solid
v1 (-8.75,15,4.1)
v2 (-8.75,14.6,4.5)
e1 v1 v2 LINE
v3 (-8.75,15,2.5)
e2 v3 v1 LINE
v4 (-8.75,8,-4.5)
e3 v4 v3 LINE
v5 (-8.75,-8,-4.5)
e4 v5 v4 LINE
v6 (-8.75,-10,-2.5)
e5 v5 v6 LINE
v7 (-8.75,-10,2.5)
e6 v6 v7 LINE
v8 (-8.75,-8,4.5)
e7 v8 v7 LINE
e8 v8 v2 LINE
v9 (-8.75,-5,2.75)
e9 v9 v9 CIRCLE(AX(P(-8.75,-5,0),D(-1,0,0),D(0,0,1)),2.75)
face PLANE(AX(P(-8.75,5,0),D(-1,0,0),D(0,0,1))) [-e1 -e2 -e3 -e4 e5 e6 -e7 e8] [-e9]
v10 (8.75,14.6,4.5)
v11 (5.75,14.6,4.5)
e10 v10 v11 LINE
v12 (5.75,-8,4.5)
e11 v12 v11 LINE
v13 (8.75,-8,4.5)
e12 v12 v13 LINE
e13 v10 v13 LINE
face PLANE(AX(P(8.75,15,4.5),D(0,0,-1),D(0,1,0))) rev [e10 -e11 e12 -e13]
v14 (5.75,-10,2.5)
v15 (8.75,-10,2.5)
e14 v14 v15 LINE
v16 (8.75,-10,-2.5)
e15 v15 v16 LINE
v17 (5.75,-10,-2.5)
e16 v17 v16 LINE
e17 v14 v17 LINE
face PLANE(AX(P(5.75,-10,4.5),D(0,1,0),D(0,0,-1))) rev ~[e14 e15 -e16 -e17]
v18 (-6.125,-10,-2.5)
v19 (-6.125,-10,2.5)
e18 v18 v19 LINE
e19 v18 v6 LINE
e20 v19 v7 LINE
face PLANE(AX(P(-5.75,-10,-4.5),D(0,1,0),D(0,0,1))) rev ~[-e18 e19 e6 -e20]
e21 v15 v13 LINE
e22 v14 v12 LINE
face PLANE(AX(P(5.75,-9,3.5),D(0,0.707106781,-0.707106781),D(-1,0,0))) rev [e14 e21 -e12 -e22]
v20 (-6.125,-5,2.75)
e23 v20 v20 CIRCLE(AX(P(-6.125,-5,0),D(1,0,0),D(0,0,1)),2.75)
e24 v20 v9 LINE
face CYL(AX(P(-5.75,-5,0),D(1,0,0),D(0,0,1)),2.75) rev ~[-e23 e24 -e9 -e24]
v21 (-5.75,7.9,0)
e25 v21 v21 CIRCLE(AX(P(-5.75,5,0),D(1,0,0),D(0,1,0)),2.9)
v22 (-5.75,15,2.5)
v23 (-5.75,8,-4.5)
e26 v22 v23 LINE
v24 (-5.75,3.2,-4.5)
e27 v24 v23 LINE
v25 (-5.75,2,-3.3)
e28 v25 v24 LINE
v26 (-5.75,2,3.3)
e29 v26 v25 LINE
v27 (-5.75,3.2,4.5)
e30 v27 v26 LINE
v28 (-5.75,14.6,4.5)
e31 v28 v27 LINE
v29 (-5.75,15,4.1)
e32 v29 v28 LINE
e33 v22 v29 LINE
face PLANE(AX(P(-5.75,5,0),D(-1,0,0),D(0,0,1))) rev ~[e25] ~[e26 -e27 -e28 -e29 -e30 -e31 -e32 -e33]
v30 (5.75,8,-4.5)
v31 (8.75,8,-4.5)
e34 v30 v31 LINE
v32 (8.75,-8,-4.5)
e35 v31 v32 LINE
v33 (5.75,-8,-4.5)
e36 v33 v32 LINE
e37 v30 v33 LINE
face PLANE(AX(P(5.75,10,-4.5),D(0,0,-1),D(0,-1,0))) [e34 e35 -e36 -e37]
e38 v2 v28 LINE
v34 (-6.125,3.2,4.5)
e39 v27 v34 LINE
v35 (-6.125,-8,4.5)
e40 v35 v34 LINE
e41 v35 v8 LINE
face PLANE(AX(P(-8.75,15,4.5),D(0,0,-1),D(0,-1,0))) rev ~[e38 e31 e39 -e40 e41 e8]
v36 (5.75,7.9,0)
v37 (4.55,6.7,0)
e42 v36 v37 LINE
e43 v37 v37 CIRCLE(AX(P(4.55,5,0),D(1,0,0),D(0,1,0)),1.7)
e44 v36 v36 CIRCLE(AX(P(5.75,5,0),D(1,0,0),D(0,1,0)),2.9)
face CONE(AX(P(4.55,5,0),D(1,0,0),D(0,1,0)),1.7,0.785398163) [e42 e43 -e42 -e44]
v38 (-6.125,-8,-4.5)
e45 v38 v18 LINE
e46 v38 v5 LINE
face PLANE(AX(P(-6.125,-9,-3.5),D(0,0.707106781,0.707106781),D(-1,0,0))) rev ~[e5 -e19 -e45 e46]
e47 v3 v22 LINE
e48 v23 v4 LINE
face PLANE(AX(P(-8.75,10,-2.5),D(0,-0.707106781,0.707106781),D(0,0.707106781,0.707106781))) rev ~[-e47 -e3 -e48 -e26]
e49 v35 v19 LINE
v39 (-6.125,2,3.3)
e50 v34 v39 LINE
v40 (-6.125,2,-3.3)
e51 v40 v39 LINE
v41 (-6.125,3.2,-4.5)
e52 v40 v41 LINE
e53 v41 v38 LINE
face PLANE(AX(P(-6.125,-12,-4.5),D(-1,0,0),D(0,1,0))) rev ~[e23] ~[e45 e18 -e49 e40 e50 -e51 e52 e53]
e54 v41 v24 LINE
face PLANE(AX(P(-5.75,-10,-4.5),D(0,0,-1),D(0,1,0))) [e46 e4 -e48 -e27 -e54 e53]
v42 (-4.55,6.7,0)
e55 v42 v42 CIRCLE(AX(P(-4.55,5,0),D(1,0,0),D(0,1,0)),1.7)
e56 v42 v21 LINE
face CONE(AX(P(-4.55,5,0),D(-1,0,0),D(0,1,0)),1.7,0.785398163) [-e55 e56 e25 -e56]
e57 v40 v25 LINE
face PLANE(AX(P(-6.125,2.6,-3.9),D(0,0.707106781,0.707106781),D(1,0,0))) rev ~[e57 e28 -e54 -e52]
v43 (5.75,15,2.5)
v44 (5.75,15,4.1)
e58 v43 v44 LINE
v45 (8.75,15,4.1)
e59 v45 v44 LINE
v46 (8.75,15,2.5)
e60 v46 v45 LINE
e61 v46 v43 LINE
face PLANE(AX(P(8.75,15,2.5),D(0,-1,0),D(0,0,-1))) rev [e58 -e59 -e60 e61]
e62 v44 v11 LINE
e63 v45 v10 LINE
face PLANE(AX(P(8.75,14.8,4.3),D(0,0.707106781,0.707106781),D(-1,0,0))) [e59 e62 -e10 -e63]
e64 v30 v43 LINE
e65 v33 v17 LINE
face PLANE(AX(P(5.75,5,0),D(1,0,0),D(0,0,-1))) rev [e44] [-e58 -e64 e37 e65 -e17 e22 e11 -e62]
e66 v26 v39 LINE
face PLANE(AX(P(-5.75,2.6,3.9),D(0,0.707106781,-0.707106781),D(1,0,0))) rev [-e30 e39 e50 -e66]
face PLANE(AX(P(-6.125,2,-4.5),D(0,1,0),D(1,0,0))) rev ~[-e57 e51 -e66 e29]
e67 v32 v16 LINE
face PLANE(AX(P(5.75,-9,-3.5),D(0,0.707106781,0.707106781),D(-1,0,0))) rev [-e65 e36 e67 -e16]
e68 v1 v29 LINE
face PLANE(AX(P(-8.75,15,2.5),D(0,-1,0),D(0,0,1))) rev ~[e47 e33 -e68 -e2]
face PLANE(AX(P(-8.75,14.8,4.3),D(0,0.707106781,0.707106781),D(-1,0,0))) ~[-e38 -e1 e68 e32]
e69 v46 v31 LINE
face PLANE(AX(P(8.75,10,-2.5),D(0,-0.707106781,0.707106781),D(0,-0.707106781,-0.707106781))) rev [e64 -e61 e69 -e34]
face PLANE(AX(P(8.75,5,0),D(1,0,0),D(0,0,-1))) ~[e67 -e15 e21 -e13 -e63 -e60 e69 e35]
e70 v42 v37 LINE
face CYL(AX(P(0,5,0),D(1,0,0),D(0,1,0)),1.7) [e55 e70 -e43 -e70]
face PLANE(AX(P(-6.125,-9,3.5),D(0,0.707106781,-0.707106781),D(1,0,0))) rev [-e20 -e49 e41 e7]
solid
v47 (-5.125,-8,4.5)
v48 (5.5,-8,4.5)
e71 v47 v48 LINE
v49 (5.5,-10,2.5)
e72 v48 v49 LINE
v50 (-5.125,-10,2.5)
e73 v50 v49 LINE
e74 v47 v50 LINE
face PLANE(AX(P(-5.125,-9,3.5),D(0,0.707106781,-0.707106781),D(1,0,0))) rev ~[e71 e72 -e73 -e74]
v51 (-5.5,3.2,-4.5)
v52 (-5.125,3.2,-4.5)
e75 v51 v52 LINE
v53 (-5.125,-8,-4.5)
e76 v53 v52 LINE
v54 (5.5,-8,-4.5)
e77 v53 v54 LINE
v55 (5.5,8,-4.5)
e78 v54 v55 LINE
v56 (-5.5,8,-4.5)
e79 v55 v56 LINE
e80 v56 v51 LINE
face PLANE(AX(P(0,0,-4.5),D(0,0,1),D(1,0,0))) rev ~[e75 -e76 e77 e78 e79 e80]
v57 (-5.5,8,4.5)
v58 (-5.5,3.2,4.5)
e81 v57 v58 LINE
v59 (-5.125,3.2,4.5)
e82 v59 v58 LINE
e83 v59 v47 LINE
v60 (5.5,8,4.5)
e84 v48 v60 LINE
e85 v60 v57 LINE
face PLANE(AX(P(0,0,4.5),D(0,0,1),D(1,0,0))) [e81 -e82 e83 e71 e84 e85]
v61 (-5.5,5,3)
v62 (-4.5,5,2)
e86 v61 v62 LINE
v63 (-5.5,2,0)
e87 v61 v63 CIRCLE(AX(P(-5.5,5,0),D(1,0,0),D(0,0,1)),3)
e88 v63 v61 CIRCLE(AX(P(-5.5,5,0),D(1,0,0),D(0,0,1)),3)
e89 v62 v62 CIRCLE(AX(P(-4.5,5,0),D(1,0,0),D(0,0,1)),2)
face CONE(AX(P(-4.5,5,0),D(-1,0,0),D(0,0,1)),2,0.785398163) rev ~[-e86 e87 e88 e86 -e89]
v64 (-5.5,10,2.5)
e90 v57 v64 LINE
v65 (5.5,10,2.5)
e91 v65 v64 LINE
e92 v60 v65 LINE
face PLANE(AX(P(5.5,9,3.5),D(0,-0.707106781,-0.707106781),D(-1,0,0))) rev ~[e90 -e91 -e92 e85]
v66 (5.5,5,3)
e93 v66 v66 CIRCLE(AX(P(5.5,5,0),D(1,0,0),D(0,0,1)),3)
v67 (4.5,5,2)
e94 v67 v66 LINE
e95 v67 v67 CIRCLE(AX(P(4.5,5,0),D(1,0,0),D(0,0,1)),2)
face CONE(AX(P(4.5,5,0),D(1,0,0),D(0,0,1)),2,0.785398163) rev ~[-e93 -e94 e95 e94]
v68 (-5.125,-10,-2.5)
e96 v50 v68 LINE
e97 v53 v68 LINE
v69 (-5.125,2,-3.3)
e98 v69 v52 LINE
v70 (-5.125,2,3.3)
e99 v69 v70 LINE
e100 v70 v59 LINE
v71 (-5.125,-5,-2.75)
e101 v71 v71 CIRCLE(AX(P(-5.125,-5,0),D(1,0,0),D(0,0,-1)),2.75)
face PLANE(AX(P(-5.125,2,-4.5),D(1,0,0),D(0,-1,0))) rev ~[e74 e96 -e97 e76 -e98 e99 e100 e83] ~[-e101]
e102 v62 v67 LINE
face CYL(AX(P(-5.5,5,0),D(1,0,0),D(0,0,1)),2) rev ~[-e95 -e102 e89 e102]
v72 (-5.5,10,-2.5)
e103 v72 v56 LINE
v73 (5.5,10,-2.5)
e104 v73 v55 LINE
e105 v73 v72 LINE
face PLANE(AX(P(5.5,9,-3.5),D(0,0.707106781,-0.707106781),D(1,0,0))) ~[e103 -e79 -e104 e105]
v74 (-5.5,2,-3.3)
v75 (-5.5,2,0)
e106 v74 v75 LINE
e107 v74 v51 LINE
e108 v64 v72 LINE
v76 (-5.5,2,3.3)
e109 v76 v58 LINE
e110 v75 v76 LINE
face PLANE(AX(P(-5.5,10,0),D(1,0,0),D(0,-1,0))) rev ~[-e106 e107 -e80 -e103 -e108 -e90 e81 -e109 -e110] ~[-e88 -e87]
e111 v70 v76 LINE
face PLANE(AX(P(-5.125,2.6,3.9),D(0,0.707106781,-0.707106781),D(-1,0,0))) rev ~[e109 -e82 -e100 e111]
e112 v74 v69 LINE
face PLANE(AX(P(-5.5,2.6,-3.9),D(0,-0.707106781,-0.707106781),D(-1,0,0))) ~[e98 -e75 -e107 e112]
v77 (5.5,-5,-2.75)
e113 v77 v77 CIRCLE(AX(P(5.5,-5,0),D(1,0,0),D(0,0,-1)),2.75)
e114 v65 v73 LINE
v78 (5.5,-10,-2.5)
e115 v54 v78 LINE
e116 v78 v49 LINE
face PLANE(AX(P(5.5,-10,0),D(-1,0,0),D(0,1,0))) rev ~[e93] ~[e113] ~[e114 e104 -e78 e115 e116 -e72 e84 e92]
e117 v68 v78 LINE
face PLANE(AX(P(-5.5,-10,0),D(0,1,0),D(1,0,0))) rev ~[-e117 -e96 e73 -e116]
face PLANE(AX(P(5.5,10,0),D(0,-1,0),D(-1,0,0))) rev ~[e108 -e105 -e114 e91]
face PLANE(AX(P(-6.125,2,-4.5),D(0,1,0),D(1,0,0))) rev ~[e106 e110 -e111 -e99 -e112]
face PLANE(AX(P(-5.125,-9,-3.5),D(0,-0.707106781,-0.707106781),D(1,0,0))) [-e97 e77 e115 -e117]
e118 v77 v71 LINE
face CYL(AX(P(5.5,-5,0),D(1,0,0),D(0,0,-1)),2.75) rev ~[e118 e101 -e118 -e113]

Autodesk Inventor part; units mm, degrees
ref_plane "YZ Plane" through (0, 0, 0) normal (1, 0, 0) x (0, 1, 0)
ref_plane "XZ Plane" through (0, 0, 0) normal (0, 1, 0) x (-1, 0, 0)
ref_plane "XY Plane" through (0, 0, 0) normal (0, 0, 1) x (1, 0, 0)
sketch "スケッチ1" plane through (0, 0, 0) normal (0, 0, 1) x (1, 0, 0)
  line L0 (-5.5, -10) -> (5.5, -10)
  line L1 (5.5, -10) -> (5.5, 10)
  line L2 (5.5, 10) -> (-5.5, 10)
  line L3 (-5.5, 10) -> (-5.5, -10)
  line L4 (-5.5, -10) -> (5.5, 10) construction
  line L5 (5.5, -10) -> (-5.5, 10) construction
  point P0 (0, 0)
  dimension "d0" = 11
  dimension "d1" = 20
extrude "押し出し1" add sketch "スケッチ1" along normal mid plane 9
sketch "スケッチ2" plane through (5.5, -10, 4.5) normal (1, 0, 0) x (0, 0, -1)
  circle A0 centre (4.5, 5) radius 2.75
  point P0 (4.5, 10)
  dimension "d4" = 5.5
  dimension "d5" = 5
extrude "押し出し2" cut sketch "スケッチ2" against normal through all
sketch "スケッチ3" plane through (-5.5, -10, 4.5) normal (-1, 0, 0) x (0, 0, 1)
  point P0 (-4.5, 10)
  point P1 (-4.5, 15)
  dimension "d8" = 5
hole "穴1" at (-5.5, 5, 0) direction (1, 0, 0) diameter 4 end through all
sketch "スケッチ4" plane through (0, 0, 0) normal (1, 0, 0) x (0, 1, 0)
  circle A0 centre (5, 0) radius 2 projected
  circle A1 centre (5, 0) radius 1.7
  point P0 (0, 0)
  dimension "d16" = 0.3
extrude "押し出し3" add sketch "スケッチ4" along normal mid plane 11.5 contours A1
sketch "スケッチ5" plane through (-5.75, 5, 0) normal (-1, 0, 0) x (0, 0, 1)
  line L0 (4.5, 5) -> (4.5, -15) projected
  line L1 (-4.5, 5) -> (4.5, 5) projected
  line L2 (-4.5, -15) -> (-4.5, 5) projected
  line L3 (-4.5, -15) -> (4.5, -15) projected
  circle A0 centre (0, -10) radius 2.75 projected
  point P0 (0, -5)
extrude "押し出し4" add sketch "スケッチ5" along normal blind 3
sketch "スケッチ6" plane through (5.75, 5, 0) normal (1, 0, 0) x (0, 0, -1)
  line L0 (4.5, 5) -> (4.5, -15) projected
  line L1 (4.5, 5) -> (-4.5, 5) projected
  line L2 (-4.5, -15) -> (-4.5, 5) projected
  line L3 (-4.5, -15) -> (4.5, -15) projected
  point P0 (0, -5)
extrude "押し出し5" add sketch "スケッチ6" along normal blind 3
chamfer "面取り1" distance 1 angle 45 2 edges at (-5.5, 5, -2) (5.5, 5, -2)
chamfer "面取り2" distance 1.2 angle 45 2 edges at (5.75, 3.3, 0) (-5.75, 3.3, 0)
sketch "スケッチ7" plane through (-5.75, -10, -4.5) normal (0, 0, -1) x (-1, 0, 0)
  line L0 (-0.25, 7.75) -> (-0.25, 2.25) projected
  line L1 (0, 7.75) -> (0, 2.25) projected
  line L2 (-0.25, 5) -> (0, 5) construction
  line L3 (-0.625, -2) -> (0.375, -2)
  line L4 (0.375, -2) -> (0.375, 12)
  line L5 (0.375, 12) -> (-0.625, 12)
  line L6 (-0.625, 12) -> (-0.625, -2)
  line L7 (-0.625, -2) -> (0.375, 12) construction
  line L8 (0.375, -2) -> (-0.625, 12) construction
  point P0 (-5.75, 10)
  point P1 (-0.125, 5)
  dimension "d29" = 1
  dimension "d30" = 14
extrude "押し出し6" cut sketch "スケッチ7" against normal through all
chamfer "面取り3" distance 1.2 angle 45 4 edges at (-5.3125, 2, 4.5) (-5.9375, 2, 4.5) (-5.9375, 2, -4.5) (-5.3125, 2, -4.5)
chamfer "面取り4" distance 2 angle 45 10 edges at (-7.4375, -10, 4.5) (0.1875, -10, 4.5) (7.25, -10, 4.5) (7.25, -10, -4.5) (0.1875, -10, -4.5) (-7.4375, -10, -4.5) (7.25, 10, -4.5) (0, 10, -4.5) (-7.25, 10, -4.5) (0, 10, 4.5)
sketch "スケッチ8" plane through (-8.75, 5, 0) normal (-1, 0, 0) x (0, 0, 1)
  line L0 (4.5, 5) -> (-2.5, 5) projected
  line L1 (4.5, -13) -> (4.5, 5) projected
  line L2 (-2.5, 5) -> (-4.5, 3) projected
  line L3 (-2.5, 5) -> (2.5, 10)
  line L4 (2.5, 10) -> (4.5, 10)
  line L5 (4.5, 10) -> (4.5, 5)
  point P0 (0, -5)
  dimension "d39" = 5
extrude "押し出し7" add sketch "スケッチ8" against normal up to surface (3 mm away)
chamfer "面取り5" distance 0.4 angle 45 1 edges at (-7.25, 15, 4.5)
mirror "ミラー1" about plane through (0, 0, 0) normal (1, 0, 0) of "押し出し7", "面取り5"
properties part number "3D_jigu_3D プリント"
